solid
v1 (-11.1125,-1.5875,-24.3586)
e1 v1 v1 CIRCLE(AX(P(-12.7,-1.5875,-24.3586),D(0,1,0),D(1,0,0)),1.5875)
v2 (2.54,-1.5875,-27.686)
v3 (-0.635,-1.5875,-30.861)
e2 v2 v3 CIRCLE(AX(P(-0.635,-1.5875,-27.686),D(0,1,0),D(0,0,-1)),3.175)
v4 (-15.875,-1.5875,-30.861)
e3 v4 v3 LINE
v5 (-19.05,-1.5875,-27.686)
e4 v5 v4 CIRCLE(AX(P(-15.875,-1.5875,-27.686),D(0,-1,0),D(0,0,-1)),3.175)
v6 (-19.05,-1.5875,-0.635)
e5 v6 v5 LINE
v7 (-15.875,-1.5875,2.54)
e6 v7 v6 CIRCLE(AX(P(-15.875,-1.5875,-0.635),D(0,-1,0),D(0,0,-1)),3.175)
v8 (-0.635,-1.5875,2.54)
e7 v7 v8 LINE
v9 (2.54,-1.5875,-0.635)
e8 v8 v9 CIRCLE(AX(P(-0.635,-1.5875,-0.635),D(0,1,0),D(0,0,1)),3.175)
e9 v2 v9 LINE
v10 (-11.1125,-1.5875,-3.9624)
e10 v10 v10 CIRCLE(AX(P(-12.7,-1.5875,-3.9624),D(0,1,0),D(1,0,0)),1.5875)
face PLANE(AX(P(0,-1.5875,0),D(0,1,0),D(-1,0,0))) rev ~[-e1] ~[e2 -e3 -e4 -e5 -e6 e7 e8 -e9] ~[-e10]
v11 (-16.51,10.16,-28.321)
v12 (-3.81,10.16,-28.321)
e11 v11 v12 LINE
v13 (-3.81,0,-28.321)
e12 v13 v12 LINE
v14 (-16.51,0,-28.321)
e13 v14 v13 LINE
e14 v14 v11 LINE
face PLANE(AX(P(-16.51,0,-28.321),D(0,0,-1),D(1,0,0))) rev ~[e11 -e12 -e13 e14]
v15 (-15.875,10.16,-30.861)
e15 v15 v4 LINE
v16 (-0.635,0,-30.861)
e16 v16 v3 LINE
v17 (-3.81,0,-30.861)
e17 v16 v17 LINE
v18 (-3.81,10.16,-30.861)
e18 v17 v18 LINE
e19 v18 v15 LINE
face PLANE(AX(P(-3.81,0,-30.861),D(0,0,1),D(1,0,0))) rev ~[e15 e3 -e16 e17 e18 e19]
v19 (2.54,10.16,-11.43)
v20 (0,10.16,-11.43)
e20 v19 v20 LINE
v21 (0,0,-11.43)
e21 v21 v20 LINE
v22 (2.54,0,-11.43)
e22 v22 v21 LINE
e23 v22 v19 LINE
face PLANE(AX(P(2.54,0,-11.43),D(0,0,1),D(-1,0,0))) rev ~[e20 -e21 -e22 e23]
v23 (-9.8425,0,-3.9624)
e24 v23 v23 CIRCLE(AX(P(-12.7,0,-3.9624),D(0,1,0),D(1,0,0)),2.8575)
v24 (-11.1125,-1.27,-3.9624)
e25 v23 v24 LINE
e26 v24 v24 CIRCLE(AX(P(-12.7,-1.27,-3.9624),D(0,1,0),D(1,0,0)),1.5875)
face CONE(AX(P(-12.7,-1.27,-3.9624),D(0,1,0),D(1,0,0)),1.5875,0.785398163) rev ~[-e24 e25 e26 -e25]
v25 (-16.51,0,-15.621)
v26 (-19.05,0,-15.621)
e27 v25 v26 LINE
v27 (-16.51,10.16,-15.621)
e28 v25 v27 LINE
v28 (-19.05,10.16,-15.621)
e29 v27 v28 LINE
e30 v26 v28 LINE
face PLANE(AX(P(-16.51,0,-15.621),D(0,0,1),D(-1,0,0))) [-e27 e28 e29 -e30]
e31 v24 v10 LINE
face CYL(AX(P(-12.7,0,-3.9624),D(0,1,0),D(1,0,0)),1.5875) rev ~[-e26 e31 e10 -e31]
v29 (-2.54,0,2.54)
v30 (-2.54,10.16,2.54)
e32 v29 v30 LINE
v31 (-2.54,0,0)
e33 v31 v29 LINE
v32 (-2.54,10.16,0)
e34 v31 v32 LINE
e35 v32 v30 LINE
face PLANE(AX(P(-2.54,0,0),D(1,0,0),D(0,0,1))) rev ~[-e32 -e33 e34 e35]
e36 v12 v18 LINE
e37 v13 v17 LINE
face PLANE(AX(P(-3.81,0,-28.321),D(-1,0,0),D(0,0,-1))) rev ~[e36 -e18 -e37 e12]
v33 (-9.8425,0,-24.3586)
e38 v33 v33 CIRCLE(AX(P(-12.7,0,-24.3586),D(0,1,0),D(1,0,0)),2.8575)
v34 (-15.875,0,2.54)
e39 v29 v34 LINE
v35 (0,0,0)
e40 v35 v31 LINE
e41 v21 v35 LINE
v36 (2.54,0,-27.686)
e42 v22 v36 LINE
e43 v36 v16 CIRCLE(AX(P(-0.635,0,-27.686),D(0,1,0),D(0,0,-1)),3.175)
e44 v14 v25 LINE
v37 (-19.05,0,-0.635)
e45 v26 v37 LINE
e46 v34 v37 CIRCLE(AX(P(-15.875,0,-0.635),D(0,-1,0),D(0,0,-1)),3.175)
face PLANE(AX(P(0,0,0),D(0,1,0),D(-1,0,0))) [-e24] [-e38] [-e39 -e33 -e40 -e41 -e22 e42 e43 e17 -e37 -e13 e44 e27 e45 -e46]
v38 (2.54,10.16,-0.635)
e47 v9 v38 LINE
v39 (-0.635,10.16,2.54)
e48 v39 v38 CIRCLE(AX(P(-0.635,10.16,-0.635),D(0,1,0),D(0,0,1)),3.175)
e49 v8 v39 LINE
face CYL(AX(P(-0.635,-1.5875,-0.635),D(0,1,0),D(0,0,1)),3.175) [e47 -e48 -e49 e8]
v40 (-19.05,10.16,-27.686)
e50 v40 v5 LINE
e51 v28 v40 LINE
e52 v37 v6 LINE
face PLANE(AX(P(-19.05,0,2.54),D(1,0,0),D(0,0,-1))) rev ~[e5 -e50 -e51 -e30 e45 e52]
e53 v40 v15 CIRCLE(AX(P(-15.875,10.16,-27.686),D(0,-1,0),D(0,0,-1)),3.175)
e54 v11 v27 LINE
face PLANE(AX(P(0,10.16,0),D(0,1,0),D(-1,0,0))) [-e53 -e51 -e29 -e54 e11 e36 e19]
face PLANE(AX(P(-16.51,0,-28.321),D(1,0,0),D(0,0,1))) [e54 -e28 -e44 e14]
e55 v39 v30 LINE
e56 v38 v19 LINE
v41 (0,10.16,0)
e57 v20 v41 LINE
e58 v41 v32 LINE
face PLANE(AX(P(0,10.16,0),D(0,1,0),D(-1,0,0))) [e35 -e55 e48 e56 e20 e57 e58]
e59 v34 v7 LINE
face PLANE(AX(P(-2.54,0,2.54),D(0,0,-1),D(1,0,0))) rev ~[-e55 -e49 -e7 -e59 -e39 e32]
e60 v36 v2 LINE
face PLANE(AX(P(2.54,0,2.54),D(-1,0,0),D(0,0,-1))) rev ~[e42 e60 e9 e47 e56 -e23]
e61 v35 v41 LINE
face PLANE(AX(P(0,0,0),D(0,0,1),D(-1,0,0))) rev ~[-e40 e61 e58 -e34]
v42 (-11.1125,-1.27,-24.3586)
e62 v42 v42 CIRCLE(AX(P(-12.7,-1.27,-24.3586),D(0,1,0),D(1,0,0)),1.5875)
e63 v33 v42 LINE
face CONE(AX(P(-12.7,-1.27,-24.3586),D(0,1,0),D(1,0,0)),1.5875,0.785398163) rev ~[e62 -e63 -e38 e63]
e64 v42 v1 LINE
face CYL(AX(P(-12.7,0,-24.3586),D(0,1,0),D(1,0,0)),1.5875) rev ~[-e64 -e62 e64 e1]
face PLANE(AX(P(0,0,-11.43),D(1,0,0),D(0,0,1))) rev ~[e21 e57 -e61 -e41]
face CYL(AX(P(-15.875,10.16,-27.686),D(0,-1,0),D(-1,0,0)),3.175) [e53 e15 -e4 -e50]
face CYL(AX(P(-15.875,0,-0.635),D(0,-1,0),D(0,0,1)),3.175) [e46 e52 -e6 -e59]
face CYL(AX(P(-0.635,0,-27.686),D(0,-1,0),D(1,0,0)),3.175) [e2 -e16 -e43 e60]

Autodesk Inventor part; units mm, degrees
ref_plane "YZ Plane" through (0, 0, 0) normal (1, 0, 0) x (0, 1, 0)
ref_plane "XZ Plane" through (0, 0, 0) normal (0, 1, 0) x (-1, 0, 0)
ref_plane "XY Plane" through (0, 0, 0) normal (0, 0, 1) x (1, 0, 0)
sketch "Sketch2" plane through (0, 0, 0) normal (0, 1, 0) x (-1, 0, 0)
  line L0 (0, 0) -> (2.54, 0)
  line L1 (2.54, 0) -> (2.54, 2.54)
  line L2 (2.54, 2.54) -> (0, 2.54)
  line L3 (0, 2.54) -> (0, 0)
  line L4 (0, 0) -> (-2.54, 0)
  line L5 (-2.54, 0) -> (-2.54, -11.43)
  line L6 (-2.54, -11.43) -> (0, -11.43)
  line L7 (0, -11.43) -> (0, 0)
  line L8 (-2.54, 0) -> (0, 0)
  line L9 (0, 0) -> (0, 2.54)
  line L10 (0, 2.54) -> (-2.54, 2.54)
  line L11 (-2.54, 2.54) -> (-2.54, 0)
  line L12 (16.51, -15.621) -> (19.05, -15.621)
  line L13 (19.05, -15.621) -> (19.05, -28.321)
  line L14 (19.05, -28.321) -> (16.51, -28.321)
  line L15 (16.51, -28.321) -> (16.51, -15.621)
  line L16 (19.05, -28.321) -> (3.81, -28.321)
  line L17 (3.81, -28.321) -> (3.81, -30.861)
  line L18 (3.81, -30.861) -> (19.05, -30.861)
  line L19 (19.05, -30.861) -> (19.05, -28.321)
  line L20 (19.05, -30.861) -> (-2.54, -30.861)
  line L21 (-2.54, -30.861) -> (-2.54, 2.54)
  line L22 (-2.54, 2.54) -> (19.05, 2.54)
  line L23 (19.05, 2.54) -> (19.05, -30.861)
  line L24 (0, 0) -> (2.54, 0)
  line L25 (2.54, 0) -> (2.54, 2.54)
  line L26 (2.54, 2.54) -> (0, 2.54)
  line L27 (0, 2.54) -> (0, 0)
  line L28 (-2.54, -11.43) -> (0, -11.43)
  line L29 (0, -11.43) -> (0, 2.54)
  line L30 (0, 2.54) -> (-2.54, 2.54)
  line L31 (-2.54, 2.54) -> (-2.54, -11.43)
  dimension "d0" = 2.54
  dimension "d1" = 2.54
  dimension "d2" = 2.54
  dimension "d3" = 11.43
  dimension "d4" = 2.54
  dimension "d5" = 12.7
  dimension "d6" = 15.24
  dimension "d7" = 2.54
  dimension "d8" = 16.51
  dimension "d9" = 28.321
extrude "Extrusion1" add sketch "Sketch2" along normal blind 10.16 contours L3 L2 L1 L0 | L4 L11 L10 L3 | L7 L6 L5 L4 | L13 L14 L15 L12 | L17 L16 L14 L19 L18
extrude "Extrusion2" add sketch "Sketch2" against normal blind 1.5875
sketch "Sketch4" plane through (0, 0, 0) normal (0, 1, 0) x (1, 0, 0)
  circle A0 centre (-12.7, 3.9624) radius 1.5875
  circle A1 centre (-12.7, 24.3586) radius 1.5875
  line L0 (-19.05, 15.621) -> (-19.05, -2.54) projected
  line L1 (-19.05, -2.54) -> (-2.54, -2.54) projected
  line L2 (2.54, 30.861) -> (-3.81, 30.861) projected
  point P0 (0, 0)
  dimension "d14" = 3.175
  dimension "d15" = 3.175
  dimension "d16" = 6.35
  dimension "d17" = 6.35
  dimension "d23" = 20.3962
  dimension "d24" = 6.5024
  dimension "d25" = 33.401
extrude "Extrusion3" cut sketch "Sketch4" against normal blind 1.5875
fillet "Fillet1" radius 3.175 4 edges at (2.54, -0.7937, -30.861) (2.54, 4.2862, 2.54) (-19.05, -0.7937, 2.54) (-19.05, 4.2863, -30.861)
chamfer "Chamfer1" distance 1.27 angle 45 2 edges at (-14.2875, 0, -24.3586) (-14.2875, 0, -3.9624)
equation "\"d24\" = -0.5 * d23 + 0.5 * d25"
properties part number "limitSwitchHolder2" material "ABS Plastic"
